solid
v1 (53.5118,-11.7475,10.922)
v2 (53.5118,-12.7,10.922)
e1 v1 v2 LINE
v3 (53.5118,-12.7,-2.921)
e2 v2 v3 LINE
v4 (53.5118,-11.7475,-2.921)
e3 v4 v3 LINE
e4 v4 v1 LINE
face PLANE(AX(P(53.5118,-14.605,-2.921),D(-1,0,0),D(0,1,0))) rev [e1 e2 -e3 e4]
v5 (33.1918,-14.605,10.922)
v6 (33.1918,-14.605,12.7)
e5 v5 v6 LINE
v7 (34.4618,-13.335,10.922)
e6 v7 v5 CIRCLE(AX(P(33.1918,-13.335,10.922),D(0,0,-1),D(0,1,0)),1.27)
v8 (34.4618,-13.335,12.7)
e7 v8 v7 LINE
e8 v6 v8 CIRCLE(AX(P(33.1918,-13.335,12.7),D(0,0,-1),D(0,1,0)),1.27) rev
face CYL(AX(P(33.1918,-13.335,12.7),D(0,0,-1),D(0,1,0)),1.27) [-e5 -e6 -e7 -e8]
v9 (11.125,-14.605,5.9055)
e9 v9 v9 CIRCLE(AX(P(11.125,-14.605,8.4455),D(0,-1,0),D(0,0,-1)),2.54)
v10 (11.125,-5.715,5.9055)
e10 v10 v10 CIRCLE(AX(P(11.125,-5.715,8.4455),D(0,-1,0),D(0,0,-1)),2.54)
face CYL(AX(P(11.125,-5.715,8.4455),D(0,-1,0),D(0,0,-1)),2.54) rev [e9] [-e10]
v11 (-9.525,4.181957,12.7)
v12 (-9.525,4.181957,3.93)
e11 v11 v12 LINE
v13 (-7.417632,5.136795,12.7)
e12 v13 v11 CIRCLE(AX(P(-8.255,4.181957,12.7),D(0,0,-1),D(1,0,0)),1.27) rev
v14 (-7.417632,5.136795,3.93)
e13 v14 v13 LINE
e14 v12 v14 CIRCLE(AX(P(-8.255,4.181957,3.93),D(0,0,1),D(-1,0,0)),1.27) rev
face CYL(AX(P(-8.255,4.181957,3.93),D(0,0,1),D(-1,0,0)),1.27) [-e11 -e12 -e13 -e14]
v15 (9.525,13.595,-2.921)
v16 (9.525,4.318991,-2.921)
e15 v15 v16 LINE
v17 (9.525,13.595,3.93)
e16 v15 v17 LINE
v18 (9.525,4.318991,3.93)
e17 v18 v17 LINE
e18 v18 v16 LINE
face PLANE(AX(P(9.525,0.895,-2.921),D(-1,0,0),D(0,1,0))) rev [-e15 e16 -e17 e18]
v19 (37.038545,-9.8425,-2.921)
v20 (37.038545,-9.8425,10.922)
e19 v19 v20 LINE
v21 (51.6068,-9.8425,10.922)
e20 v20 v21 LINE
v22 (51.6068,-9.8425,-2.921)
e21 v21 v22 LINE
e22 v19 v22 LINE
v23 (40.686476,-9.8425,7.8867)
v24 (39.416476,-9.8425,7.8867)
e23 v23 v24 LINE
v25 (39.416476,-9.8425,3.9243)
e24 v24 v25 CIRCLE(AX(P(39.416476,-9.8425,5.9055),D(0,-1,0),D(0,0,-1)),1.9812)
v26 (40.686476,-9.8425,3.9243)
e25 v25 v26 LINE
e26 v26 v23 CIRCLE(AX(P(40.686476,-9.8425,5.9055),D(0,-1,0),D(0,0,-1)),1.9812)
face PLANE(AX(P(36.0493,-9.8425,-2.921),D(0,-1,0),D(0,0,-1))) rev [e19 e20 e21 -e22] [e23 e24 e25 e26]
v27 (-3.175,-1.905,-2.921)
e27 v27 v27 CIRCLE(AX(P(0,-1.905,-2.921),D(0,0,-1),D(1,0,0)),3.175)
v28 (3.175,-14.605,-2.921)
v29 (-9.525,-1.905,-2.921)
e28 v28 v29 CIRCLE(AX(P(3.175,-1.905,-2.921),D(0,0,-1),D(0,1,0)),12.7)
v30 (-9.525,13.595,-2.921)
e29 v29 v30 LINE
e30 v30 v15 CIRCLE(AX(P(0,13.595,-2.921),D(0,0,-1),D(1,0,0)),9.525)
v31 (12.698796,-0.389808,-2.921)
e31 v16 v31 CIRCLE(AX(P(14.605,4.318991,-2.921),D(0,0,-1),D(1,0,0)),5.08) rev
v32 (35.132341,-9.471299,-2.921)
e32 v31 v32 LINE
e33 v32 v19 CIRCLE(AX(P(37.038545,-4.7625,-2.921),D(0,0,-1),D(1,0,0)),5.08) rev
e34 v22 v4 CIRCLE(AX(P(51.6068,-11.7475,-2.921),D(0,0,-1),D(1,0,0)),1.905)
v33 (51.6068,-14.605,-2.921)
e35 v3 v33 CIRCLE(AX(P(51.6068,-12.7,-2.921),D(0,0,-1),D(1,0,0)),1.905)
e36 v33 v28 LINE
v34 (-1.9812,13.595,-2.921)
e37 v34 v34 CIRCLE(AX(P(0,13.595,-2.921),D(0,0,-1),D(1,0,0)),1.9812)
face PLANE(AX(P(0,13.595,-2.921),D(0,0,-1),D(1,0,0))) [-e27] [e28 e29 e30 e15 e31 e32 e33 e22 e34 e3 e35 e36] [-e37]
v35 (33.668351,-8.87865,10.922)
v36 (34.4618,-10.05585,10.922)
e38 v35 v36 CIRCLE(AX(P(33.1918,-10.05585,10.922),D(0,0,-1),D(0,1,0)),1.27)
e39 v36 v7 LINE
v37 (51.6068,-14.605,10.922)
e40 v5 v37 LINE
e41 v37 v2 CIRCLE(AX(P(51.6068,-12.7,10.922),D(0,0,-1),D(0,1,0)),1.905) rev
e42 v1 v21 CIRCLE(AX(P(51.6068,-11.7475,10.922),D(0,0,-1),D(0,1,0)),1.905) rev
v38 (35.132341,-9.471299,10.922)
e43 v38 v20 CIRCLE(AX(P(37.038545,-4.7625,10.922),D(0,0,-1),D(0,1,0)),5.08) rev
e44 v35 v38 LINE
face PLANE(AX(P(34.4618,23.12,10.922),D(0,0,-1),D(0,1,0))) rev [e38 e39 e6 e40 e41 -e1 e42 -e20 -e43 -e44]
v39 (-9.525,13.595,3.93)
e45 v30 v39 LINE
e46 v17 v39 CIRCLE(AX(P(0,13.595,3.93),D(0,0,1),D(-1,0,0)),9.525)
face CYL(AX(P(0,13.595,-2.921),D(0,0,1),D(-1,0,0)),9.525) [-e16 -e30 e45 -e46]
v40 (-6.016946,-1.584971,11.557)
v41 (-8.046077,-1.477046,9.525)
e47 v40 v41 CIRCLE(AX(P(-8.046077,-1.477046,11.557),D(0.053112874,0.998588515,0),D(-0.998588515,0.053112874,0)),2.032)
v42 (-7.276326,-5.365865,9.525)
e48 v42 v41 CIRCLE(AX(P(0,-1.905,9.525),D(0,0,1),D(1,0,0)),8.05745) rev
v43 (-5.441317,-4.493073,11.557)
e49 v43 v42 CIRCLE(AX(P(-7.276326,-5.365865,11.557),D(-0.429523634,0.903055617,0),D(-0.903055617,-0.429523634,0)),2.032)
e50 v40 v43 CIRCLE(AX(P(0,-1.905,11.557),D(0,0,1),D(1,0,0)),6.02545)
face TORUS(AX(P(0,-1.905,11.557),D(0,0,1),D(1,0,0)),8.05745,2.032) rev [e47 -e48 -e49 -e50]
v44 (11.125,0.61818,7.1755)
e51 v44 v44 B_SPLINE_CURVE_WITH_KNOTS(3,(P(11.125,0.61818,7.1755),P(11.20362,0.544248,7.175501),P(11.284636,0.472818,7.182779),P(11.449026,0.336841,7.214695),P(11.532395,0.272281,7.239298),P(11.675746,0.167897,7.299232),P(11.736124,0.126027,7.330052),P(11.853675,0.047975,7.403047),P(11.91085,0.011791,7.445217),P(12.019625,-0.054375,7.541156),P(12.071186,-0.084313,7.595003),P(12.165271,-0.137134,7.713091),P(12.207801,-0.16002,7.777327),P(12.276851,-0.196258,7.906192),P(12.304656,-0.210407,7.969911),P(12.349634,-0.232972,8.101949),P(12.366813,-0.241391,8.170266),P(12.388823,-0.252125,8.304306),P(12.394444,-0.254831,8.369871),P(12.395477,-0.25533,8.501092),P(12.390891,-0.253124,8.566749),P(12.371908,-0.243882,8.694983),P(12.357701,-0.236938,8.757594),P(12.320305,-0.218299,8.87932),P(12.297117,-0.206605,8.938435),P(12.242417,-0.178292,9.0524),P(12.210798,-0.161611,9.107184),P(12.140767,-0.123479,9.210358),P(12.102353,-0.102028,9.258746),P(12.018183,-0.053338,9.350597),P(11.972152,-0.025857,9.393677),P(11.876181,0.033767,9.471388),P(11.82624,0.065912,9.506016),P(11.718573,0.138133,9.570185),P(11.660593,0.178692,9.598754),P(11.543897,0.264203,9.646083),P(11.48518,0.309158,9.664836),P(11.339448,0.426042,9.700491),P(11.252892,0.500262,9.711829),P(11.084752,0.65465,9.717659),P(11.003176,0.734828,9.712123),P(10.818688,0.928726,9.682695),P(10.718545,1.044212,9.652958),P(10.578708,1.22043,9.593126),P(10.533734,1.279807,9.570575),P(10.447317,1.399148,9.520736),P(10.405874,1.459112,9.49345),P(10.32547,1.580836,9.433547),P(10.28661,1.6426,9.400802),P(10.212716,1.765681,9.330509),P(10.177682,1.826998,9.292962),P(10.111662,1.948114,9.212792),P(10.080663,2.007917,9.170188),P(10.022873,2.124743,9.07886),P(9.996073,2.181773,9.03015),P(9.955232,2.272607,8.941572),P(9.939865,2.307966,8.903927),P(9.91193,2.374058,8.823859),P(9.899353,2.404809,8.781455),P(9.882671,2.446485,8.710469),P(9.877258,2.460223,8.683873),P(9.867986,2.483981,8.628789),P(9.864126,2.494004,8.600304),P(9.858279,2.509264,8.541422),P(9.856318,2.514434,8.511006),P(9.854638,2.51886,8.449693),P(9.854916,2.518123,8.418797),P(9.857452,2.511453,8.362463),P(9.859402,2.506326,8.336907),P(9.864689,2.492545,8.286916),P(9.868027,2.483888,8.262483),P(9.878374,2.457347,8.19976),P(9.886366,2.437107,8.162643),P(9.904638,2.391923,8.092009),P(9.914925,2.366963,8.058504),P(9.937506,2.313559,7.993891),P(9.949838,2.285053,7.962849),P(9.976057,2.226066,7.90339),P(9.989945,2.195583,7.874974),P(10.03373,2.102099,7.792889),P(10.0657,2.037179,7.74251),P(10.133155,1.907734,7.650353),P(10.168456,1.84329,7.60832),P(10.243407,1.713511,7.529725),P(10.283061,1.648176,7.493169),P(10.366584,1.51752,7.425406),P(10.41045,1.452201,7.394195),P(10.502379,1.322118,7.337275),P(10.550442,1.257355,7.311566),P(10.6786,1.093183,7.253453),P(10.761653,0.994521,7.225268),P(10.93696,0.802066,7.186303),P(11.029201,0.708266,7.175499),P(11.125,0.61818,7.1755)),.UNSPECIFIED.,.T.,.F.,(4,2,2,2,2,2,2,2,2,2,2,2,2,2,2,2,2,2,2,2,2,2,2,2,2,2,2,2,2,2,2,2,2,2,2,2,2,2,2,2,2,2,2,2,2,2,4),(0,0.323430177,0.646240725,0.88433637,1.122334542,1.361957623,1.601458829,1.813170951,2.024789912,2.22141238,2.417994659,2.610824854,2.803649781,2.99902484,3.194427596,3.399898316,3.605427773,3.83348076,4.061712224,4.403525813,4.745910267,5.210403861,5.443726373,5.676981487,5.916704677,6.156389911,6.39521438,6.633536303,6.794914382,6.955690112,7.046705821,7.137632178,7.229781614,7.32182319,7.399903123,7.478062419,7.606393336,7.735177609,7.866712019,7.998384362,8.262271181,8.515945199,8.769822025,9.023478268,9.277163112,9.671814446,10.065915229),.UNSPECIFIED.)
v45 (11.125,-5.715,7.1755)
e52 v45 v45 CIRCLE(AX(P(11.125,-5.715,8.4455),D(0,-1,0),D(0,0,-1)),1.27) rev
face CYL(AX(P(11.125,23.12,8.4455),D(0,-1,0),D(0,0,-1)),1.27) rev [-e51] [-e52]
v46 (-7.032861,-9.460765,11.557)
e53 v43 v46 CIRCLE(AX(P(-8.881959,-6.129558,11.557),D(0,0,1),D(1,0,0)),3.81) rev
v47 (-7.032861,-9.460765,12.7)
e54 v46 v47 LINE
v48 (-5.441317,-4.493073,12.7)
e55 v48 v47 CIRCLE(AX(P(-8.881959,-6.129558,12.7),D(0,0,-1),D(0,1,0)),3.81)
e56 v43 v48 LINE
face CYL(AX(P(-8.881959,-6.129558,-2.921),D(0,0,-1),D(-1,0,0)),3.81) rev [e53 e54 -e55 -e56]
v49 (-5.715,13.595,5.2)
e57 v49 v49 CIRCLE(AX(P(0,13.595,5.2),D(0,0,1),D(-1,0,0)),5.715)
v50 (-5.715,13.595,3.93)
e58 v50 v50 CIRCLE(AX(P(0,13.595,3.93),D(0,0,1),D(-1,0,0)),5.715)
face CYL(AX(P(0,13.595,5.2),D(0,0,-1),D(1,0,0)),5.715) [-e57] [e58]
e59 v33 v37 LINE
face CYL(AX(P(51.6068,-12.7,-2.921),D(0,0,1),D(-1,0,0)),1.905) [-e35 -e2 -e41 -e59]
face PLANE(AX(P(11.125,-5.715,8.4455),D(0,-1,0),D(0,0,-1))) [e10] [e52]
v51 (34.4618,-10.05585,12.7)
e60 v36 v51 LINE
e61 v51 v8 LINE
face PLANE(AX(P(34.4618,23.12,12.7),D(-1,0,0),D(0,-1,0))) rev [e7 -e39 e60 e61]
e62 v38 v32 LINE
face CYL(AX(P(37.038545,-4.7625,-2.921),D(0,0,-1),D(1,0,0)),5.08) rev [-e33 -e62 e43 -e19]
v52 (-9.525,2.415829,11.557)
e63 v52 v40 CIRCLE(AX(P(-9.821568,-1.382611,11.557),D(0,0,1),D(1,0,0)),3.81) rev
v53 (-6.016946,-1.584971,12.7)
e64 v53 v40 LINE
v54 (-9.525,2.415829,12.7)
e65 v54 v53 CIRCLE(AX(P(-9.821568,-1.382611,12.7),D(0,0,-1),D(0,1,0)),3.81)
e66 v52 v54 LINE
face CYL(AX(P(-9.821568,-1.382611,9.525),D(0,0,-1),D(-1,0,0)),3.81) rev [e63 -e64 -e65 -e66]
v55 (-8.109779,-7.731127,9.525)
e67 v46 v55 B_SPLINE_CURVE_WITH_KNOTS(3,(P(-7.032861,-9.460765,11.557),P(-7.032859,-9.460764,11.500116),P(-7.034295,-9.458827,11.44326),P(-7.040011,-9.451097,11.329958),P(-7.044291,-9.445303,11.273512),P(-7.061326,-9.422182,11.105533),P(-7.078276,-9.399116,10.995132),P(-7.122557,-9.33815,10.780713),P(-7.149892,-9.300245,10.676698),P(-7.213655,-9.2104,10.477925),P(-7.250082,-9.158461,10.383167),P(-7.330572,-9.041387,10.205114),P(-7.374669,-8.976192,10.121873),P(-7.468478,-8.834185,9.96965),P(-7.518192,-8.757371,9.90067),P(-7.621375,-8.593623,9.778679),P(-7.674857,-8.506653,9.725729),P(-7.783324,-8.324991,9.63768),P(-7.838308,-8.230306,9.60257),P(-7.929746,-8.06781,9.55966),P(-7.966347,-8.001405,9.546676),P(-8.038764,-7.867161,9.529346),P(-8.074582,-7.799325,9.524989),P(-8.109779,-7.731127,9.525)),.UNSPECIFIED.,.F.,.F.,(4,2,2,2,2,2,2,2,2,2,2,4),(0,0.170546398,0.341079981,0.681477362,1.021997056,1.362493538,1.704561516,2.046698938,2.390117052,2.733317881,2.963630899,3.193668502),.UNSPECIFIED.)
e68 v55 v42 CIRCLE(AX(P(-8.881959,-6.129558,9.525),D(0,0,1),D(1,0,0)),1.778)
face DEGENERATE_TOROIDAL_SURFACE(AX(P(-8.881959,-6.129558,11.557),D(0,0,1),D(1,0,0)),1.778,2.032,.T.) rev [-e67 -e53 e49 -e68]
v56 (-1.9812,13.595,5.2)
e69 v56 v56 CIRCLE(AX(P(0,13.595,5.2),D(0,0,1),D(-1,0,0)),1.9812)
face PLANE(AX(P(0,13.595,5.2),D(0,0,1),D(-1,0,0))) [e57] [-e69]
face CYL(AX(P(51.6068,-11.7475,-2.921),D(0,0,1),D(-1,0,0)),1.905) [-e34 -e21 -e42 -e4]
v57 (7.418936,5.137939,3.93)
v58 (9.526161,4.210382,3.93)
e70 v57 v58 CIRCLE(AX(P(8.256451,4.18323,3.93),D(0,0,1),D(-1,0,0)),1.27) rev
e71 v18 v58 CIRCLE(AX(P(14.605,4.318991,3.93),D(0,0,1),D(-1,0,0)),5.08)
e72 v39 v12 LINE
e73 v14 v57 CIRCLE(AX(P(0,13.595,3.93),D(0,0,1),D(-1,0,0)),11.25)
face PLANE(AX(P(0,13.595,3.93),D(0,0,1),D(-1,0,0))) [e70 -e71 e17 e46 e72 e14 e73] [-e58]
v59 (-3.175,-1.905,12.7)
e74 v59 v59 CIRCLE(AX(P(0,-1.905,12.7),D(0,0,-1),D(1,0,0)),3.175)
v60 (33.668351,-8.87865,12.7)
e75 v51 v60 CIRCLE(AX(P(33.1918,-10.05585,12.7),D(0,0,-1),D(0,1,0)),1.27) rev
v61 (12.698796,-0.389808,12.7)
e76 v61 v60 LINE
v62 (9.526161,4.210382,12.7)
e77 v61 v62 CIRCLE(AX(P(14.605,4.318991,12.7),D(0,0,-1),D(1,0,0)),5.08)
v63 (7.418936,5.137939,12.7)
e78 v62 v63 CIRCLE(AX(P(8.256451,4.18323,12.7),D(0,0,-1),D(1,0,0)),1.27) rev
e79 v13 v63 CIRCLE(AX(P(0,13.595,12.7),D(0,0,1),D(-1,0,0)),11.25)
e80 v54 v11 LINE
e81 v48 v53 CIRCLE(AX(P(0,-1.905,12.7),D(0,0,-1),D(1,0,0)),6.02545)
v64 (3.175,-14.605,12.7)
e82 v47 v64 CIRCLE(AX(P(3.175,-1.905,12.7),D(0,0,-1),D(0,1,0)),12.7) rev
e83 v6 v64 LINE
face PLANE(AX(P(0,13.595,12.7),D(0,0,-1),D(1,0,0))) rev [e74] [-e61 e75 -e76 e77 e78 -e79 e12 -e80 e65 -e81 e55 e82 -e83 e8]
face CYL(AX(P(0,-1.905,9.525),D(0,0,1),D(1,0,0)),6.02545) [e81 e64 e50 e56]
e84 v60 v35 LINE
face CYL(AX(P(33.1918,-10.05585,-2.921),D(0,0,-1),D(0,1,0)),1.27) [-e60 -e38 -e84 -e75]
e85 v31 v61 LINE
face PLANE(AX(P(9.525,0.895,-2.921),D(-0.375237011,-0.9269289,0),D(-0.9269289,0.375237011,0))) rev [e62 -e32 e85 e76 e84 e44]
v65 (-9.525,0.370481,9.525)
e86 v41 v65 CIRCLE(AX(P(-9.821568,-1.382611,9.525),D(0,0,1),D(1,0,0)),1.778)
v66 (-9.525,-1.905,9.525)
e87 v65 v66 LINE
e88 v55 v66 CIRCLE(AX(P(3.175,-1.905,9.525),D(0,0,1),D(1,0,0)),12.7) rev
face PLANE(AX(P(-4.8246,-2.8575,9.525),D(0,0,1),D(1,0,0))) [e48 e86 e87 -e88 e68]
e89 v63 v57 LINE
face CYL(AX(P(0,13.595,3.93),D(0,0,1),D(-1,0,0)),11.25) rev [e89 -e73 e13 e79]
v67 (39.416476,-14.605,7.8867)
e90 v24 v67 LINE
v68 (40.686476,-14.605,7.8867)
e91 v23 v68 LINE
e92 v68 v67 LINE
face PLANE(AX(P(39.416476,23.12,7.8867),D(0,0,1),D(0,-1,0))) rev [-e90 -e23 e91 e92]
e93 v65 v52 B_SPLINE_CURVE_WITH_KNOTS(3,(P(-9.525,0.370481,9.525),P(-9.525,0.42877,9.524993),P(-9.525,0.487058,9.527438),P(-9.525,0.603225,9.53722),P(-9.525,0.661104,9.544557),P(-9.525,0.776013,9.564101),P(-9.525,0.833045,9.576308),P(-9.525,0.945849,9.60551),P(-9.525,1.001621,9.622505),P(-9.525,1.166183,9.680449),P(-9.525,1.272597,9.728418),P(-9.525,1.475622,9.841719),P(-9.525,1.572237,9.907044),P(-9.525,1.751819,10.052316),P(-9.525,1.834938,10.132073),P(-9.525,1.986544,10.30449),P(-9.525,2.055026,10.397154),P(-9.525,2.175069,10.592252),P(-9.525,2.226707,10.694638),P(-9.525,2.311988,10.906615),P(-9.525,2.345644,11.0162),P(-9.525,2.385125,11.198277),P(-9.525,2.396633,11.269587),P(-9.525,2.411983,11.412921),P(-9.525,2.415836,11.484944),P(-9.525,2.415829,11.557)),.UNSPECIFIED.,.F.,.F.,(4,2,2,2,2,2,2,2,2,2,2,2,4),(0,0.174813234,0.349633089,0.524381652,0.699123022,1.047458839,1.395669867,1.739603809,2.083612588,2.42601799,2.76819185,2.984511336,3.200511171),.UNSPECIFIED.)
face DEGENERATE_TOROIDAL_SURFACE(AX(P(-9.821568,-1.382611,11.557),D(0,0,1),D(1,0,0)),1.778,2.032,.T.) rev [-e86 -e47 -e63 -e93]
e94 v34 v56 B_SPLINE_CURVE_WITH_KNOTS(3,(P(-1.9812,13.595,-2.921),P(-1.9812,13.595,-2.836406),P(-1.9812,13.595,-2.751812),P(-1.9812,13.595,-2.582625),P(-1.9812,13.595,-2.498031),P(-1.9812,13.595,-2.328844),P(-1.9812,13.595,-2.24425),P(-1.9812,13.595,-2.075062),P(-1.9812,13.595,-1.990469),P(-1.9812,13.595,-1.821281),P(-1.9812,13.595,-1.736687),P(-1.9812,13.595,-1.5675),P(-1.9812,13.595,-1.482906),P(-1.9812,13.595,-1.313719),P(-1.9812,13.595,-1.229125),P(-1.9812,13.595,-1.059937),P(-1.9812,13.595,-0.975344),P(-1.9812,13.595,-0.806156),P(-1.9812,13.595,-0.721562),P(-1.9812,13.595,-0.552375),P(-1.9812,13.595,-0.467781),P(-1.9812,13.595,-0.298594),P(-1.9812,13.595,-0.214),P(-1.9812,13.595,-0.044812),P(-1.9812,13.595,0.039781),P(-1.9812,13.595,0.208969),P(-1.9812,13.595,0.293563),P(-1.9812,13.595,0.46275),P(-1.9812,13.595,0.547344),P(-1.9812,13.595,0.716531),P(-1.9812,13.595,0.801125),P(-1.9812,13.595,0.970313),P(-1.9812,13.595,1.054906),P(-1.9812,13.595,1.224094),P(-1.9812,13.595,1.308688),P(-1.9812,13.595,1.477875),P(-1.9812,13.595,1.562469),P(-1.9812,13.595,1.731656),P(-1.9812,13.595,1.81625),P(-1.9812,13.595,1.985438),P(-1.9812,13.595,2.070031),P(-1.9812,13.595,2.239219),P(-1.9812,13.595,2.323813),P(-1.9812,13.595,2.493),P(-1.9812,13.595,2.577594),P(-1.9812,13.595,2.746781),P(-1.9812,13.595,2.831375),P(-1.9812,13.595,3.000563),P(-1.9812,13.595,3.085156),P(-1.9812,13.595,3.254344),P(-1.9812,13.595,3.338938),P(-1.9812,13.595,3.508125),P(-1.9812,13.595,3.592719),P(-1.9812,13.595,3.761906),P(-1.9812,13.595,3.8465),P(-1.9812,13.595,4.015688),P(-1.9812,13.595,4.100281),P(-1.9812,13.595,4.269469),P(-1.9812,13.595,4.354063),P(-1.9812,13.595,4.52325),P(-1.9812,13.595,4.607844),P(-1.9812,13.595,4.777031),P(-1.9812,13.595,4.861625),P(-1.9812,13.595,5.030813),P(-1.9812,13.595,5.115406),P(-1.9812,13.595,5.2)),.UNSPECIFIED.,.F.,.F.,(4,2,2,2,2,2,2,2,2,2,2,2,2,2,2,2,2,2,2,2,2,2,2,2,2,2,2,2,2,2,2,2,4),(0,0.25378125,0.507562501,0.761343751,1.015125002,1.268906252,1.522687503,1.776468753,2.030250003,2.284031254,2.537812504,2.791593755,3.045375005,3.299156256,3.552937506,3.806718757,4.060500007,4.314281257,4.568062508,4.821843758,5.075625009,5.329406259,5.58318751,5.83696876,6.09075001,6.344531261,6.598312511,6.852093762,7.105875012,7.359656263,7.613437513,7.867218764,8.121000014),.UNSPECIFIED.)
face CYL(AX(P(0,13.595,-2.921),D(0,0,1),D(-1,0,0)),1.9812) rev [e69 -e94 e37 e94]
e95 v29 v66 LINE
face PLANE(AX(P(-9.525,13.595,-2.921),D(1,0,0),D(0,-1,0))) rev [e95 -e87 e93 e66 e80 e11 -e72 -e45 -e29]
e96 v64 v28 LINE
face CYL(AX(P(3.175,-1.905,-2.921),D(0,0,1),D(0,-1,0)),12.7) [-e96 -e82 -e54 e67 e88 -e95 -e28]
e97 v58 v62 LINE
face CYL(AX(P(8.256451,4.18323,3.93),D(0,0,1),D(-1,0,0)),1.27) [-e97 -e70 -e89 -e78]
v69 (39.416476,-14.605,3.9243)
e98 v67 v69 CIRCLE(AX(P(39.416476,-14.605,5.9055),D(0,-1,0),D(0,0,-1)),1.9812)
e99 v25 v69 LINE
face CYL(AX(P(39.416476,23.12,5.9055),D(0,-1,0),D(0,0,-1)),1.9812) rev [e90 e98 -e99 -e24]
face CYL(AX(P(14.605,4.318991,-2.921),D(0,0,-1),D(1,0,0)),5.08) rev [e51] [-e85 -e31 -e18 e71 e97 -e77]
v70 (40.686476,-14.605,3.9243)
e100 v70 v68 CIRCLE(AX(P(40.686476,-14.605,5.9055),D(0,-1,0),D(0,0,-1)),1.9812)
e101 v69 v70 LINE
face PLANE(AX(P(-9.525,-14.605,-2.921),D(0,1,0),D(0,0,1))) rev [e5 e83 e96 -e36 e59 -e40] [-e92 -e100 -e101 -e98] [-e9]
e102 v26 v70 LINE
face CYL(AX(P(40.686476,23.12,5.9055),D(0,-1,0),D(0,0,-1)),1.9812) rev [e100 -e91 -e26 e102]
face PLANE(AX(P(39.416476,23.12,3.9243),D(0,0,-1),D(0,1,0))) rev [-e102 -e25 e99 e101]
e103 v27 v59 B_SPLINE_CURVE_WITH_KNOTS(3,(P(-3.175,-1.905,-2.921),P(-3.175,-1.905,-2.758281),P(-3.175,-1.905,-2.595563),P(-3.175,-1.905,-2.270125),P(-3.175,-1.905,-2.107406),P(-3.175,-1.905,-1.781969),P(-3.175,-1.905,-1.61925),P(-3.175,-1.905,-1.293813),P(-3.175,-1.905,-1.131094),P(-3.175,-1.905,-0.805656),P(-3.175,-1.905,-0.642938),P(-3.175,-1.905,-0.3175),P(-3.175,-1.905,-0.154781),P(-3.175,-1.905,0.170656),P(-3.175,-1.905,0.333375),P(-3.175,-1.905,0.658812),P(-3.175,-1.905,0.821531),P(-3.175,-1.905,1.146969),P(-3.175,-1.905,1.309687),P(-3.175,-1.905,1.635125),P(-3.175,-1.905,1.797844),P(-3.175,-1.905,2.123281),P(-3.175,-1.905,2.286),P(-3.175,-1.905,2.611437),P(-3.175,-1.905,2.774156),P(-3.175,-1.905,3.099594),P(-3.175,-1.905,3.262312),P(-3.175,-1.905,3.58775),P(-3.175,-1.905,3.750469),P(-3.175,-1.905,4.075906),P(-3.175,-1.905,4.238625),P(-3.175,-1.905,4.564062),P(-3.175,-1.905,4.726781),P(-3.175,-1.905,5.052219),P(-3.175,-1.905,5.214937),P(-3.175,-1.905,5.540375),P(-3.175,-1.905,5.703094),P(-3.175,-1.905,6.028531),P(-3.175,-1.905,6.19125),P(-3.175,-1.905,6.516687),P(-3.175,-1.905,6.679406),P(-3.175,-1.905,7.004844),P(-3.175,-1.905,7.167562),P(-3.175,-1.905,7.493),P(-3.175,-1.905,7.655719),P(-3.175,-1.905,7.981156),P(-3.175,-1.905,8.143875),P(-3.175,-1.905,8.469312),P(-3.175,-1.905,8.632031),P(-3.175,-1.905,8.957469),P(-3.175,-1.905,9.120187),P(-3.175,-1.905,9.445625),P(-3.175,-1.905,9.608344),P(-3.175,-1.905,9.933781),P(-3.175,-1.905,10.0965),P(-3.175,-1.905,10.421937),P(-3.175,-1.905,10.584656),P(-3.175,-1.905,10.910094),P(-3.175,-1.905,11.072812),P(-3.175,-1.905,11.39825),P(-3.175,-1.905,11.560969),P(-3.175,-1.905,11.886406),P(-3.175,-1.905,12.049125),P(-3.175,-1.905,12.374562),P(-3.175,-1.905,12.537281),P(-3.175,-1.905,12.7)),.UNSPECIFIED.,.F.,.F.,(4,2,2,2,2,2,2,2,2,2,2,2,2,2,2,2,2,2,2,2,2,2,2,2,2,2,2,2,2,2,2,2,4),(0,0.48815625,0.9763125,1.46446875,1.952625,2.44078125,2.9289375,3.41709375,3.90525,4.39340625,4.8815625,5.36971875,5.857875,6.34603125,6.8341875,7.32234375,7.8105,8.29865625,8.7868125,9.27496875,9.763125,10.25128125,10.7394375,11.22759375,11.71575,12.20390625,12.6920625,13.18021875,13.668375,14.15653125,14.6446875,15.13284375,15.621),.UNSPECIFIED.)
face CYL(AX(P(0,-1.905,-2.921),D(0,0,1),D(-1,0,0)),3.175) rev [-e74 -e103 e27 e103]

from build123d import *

# Parameters (mm, degrees)
SKETCH1_R             = 1.9812
SKETCH1_R_2           = 3.175
BOSS_EXTRUDE1_DEPTH   = 15.621
FILLET1_R             = 5.08
FILLET2_R             = 1.905
SKETCH2_R             = 11.25
CUT_EXTRUDE1_DEPTH    = 8.769999986
BOSS_EXTRUDE2_START   = 1.27
SKETCH3_R             = 5.715
SKETCH3_R_2           = 1.9812
BOSS_EXTRUDE2_DEPTH   = 1.27
FILLET3_R             = 1.27
BODY_MOVE_COPY1_ANGLE = 180
SKETCH4_W             = 19.05
SKETCH4_H             = 1.778
CUT_EXTRUDE2_DEPTH    = 67.693165799
FILLET4_R             = 1.27
FILLET5_R             = 12.7
CUT_EXTRUDE3_DEPTH    = 3.175
SKETCH6_R             = 1.27
CUT_EXTRUDE4_DEPTH    = 67.693165799
FILLET6_R             = 3.81
FILLET7_R             = 2.032
SKETCH7_R             = 2.54
CUT_EXTRUDE5_DEPTH    = 8.89


with BuildPart() as part:
    # Sketch1 → Boss-Extrude1 (new body)
    with BuildSketch(Plane.XY):
        with BuildLine():
            Line((-9.525, 0), (-9.525, 28.2))
            Line((-9.525, 28.2), (53.5118, 28.2))
            Line((53.5118, 28.2), (53.5118, 23.4375))
            Line((53.5118, 23.4375), (36.0493, 23.4375))
            Line((36.0493, 23.4375), (9.525, 12.7))
            Line((9.525, 12.7), (9.525, 0))
            ThreePointArc((9.525, 0), (0, -9.525), (-9.525, 0))
        make_face()
        with Locations(Location((0, 0, 0), (0, 0, 180))):
            Circle(SKETCH1_R, mode=Mode.SUBTRACT)
        with Locations(Location((0, 15.5, 0), (0, 0, 180))):
            Circle(SKETCH1_R_2, mode=Mode.SUBTRACT)
    extrude(amount=BOSS_EXTRUDE1_DEPTH)

    # Fillet1
    fillet1_edges = [part.edges().sort_by_distance(p)[0] for p in [
        (36.0493, 23.4375, 7.8105),
        (9.525, 12.7, 7.8105),
    ]]
    fillet(fillet1_edges, radius=FILLET1_R)

    # Fillet2
    fillet2_edges = [part.edges().sort_by_distance(p)[0] for p in [
        (53.5118, 28.2, 7.8105),
        (53.5118, 23.4375, 7.8105),
    ]]
    fillet(fillet2_edges, radius=FILLET2_R)

    # Sketch2 → Cut-Extrude1 (cut)
    with BuildSketch(Plane(origin=(0, 0, 0), x_dir=(-1, 0, 0), z_dir=(0, 0, -1))):
        Circle(SKETCH2_R)
    extrude(amount=-CUT_EXTRUDE1_DEPTH, mode=Mode.SUBTRACT)

    # Sketch3 → Boss-Extrude2 (add)
    with BuildSketch(Plane(origin=(0, 0, 8.769999986), x_dir=(-1, 0, 0), z_dir=(0, 0, -1)).offset(BOSS_EXTRUDE2_START)):
        Circle(SKETCH3_R)
        Circle(SKETCH3_R_2, mode=Mode.SUBTRACT)
    extrude(amount=-BOSS_EXTRUDE2_DEPTH)

    # Fillet3
    # the kernel refuses this fillet: 1.27 mm, written as the material it takes off along each edge
    with BuildSketch(Plane(origin=(-9.525, 5.986390816, 8.769999986), x_dir=(0, 1, 0), z_dir=(0, 0, -1))) as fillet3_piece_1:
        with BuildLine():
            CenterArc((3.426651997, 1.27), FILLET3_R, 138.750058465, 131.249941535)
            ThreePointArc((2.471814587, 2.107368211), (1.312365255, 0.964003573), (0, 0))
            Line((0, 0), (3.426651997, 0))
        make_face()
    extrude(amount=17.336629979, mode=Mode.SUBTRACT)
    with BuildSketch(Plane(origin=(9.525, 5.986390816, 8.769999986), x_dir=(-0.6487196430292314, 0.761027479627396, 0), z_dir=(0, 0, -1))) as fillet3_piece_2:
        with BuildLine():
            CenterArc((3.429739885, 1.256710275), FILLET3_R, 131.670192506, 130.033722059)
            Line((2.585390755, 2.205380158), (2.500955842, 2.300247146))
            ThreePointArc((2.500955842, 2.300247146), (2.421102629, 2.230690584), (-0.082387395, 0.09665049))
            Line((-0.082387395, 0.09665049), (0.018324651, -0.125671027))
            ThreePointArc((0.018324651, -0.125671027), (1.623246685, -0.009276057), (3.228168719, -0.125671027))
            Line((3.228168719, -0.125671027), (3.24649337, 0))
        make_face()
    extrude(amount=17.26556758, mode=Mode.SUBTRACT)


with BuildPart() as part_1:
    # Body-Move/Copy1: moved
    add(part.part.rotate(Axis((0, 6.7975, 6.35), (1, 0, 0)), BODY_MOVE_COPY1_ANGLE))

    # Sketch4 → Cut-Extrude2 (cut, through all)
    with BuildSketch(Plane.XZ.offset(14.605)):
        with Locations((43.9868, 11.811)):
            Rectangle(SKETCH4_W, SKETCH4_H)
    extrude(amount=-CUT_EXTRUDE2_DEPTH, mode=Mode.SUBTRACT)

    # Fillet4
    fillet4_edges = [part_1.edges().sort_by_distance(p)[0] for p in [
        (34.4618, -9.199852268, 11.811),
        (34.4618, -14.605, 11.811),
    ]]
    fillet(fillet4_edges, radius=FILLET4_R)

    # Fillet5
    fillet5_edges = [part_1.edges().sort_by_distance(p)[0] for p in [
        (-9.525, -14.605, 4.8895),
    ]]
    fillet(fillet5_edges, radius=FILLET5_R)

    # Sketch5 → Cut-Extrude3 (cut)
    with BuildSketch(Plane.XY.offset(12.7)):
        with BuildLine():
            ThreePointArc((-5.408855404, 0.750246956), (-5.911348625, -3.072052101), (-3.993935769, -6.416599523))
            ThreePointArc((-3.993935769, -6.416599523), (-15.75834811, -5.016102801), (-5.408855404, 0.750246956))
        make_face()
    extrude(amount=-CUT_EXTRUDE3_DEPTH, mode=Mode.SUBTRACT)

    # Sketch6 → Cut-Extrude4 (cut, through all)
    with BuildSketch(Plane.XZ.offset(14.605)):
        with Locations(Location((11.125, 8.4455, 0), (0, 0, 270))):
            Circle(SKETCH6_R)
        with BuildLine():
            Line((39.416476, 7.8867), (40.686476, 7.8867))
            ThreePointArc((40.686476, 7.8867), (42.667676, 5.9055), (40.686476, 3.9243))
            Line((40.686476, 3.9243), (39.416476, 3.9243))
            ThreePointArc((39.416476, 3.9243), (37.435276, 5.9055), (39.416476, 7.8867))
        make_face()
    extrude(amount=-CUT_EXTRUDE4_DEPTH, mode=Mode.SUBTRACT)

    # Fillet6
    # the kernel refuses this fillet: 3.81 mm, written as the material it adds along each edge
    with BuildSketch(Plane(origin=(-5.408855404, 0.750246956, 12.7), x_dir=(-0.2519962053537531, -0.9677282224298872, 0), z_dir=(0, 0, -1))) as fillet6_piece_1:
        with BuildLine():
            CenterArc((3.176013598, 3.732834284), FILLET6_R, 169.868712544, 88.580194717)
            Line((-0.574578104, 4.403029693), (-0.649589938, 4.416433601))
            ThreePointArc((-0.649589938, 4.416433601), (-0.768643464, 2.138699984), (-0.067078157, -0.036151913))
            Line((-0.067078157, -0.036151913), (0.015258417, -0.074656686))
            ThreePointArc((0.015258417, -0.074656686), (1.20654638, 0.045836272), (2.397834343, -0.074656686))
            Line((2.397834343, -0.074656686), (2.41309276, 0))
        make_face()
    extrude(amount=14.275903813)
    with BuildSketch(Plane(origin=(-3.993935769, -6.416599523, 12.7), x_dir=(-0.7064973640588543, -0.7077156735426245, 0), z_dir=(0, 0, -1))) as fillet6_piece_2_section:
        with BuildLine():
            CenterArc((3.250231885, 3.662124285), FILLET6_R, 199.612026349, 86.403394204)
            Line((-0.338738664, 2.383300453), (-0.410518075, 2.357723976))
            ThreePointArc((-0.410518075, 2.357723976), (-0.12457926, 1.198016243), (-0.076063221, 0.004563593))
            Line((-0.076063221, 0.004563593), (-0.026317873, -0.071510905))
            ThreePointArc((-0.026317873, -0.071510905), (2.150697936, -0.459393071), (4.322419151, -0.073242486))
            Line((4.322419151, -0.073242486), (4.301395871, 0))
        make_face()
    fillet6_piece_2 = extrude(amount=13.928489678, mode=Mode.PRIVATE)
    fillet6_piece_2 = fillet6_piece_2 & Plane(origin=(3.175, -1.905, 11.1125), x_dir=(-1, 0, 0), z_dir=(0, 0, -1)) * Cylinder(12.7, 46, mode=Mode.PRIVATE)
    add(fillet6_piece_2)

    # Fillet7
    fillet7_edges = [part_1.edges().sort_by_distance(p)[0] for p in [
        (-5.910770655, -3.074975831, 9.525),
        (-5.253622107, -7.292001089, 9.525),
        (-6.956861839, 1.129272671, 9.525),
    ]]
    fillet(fillet7_edges, radius=FILLET7_R)

    # Sketch7 → Cut-Extrude5 (cut)
    with BuildSketch(Plane.XZ.offset(14.605)):
        with Locations(Location((11.125, 8.4455, 0), (0, 0, 270))):
            Circle(SKETCH7_R)
    extrude(amount=-CUT_EXTRUDE5_DEPTH, mode=Mode.SUBTRACT)


solid = part_1.part
